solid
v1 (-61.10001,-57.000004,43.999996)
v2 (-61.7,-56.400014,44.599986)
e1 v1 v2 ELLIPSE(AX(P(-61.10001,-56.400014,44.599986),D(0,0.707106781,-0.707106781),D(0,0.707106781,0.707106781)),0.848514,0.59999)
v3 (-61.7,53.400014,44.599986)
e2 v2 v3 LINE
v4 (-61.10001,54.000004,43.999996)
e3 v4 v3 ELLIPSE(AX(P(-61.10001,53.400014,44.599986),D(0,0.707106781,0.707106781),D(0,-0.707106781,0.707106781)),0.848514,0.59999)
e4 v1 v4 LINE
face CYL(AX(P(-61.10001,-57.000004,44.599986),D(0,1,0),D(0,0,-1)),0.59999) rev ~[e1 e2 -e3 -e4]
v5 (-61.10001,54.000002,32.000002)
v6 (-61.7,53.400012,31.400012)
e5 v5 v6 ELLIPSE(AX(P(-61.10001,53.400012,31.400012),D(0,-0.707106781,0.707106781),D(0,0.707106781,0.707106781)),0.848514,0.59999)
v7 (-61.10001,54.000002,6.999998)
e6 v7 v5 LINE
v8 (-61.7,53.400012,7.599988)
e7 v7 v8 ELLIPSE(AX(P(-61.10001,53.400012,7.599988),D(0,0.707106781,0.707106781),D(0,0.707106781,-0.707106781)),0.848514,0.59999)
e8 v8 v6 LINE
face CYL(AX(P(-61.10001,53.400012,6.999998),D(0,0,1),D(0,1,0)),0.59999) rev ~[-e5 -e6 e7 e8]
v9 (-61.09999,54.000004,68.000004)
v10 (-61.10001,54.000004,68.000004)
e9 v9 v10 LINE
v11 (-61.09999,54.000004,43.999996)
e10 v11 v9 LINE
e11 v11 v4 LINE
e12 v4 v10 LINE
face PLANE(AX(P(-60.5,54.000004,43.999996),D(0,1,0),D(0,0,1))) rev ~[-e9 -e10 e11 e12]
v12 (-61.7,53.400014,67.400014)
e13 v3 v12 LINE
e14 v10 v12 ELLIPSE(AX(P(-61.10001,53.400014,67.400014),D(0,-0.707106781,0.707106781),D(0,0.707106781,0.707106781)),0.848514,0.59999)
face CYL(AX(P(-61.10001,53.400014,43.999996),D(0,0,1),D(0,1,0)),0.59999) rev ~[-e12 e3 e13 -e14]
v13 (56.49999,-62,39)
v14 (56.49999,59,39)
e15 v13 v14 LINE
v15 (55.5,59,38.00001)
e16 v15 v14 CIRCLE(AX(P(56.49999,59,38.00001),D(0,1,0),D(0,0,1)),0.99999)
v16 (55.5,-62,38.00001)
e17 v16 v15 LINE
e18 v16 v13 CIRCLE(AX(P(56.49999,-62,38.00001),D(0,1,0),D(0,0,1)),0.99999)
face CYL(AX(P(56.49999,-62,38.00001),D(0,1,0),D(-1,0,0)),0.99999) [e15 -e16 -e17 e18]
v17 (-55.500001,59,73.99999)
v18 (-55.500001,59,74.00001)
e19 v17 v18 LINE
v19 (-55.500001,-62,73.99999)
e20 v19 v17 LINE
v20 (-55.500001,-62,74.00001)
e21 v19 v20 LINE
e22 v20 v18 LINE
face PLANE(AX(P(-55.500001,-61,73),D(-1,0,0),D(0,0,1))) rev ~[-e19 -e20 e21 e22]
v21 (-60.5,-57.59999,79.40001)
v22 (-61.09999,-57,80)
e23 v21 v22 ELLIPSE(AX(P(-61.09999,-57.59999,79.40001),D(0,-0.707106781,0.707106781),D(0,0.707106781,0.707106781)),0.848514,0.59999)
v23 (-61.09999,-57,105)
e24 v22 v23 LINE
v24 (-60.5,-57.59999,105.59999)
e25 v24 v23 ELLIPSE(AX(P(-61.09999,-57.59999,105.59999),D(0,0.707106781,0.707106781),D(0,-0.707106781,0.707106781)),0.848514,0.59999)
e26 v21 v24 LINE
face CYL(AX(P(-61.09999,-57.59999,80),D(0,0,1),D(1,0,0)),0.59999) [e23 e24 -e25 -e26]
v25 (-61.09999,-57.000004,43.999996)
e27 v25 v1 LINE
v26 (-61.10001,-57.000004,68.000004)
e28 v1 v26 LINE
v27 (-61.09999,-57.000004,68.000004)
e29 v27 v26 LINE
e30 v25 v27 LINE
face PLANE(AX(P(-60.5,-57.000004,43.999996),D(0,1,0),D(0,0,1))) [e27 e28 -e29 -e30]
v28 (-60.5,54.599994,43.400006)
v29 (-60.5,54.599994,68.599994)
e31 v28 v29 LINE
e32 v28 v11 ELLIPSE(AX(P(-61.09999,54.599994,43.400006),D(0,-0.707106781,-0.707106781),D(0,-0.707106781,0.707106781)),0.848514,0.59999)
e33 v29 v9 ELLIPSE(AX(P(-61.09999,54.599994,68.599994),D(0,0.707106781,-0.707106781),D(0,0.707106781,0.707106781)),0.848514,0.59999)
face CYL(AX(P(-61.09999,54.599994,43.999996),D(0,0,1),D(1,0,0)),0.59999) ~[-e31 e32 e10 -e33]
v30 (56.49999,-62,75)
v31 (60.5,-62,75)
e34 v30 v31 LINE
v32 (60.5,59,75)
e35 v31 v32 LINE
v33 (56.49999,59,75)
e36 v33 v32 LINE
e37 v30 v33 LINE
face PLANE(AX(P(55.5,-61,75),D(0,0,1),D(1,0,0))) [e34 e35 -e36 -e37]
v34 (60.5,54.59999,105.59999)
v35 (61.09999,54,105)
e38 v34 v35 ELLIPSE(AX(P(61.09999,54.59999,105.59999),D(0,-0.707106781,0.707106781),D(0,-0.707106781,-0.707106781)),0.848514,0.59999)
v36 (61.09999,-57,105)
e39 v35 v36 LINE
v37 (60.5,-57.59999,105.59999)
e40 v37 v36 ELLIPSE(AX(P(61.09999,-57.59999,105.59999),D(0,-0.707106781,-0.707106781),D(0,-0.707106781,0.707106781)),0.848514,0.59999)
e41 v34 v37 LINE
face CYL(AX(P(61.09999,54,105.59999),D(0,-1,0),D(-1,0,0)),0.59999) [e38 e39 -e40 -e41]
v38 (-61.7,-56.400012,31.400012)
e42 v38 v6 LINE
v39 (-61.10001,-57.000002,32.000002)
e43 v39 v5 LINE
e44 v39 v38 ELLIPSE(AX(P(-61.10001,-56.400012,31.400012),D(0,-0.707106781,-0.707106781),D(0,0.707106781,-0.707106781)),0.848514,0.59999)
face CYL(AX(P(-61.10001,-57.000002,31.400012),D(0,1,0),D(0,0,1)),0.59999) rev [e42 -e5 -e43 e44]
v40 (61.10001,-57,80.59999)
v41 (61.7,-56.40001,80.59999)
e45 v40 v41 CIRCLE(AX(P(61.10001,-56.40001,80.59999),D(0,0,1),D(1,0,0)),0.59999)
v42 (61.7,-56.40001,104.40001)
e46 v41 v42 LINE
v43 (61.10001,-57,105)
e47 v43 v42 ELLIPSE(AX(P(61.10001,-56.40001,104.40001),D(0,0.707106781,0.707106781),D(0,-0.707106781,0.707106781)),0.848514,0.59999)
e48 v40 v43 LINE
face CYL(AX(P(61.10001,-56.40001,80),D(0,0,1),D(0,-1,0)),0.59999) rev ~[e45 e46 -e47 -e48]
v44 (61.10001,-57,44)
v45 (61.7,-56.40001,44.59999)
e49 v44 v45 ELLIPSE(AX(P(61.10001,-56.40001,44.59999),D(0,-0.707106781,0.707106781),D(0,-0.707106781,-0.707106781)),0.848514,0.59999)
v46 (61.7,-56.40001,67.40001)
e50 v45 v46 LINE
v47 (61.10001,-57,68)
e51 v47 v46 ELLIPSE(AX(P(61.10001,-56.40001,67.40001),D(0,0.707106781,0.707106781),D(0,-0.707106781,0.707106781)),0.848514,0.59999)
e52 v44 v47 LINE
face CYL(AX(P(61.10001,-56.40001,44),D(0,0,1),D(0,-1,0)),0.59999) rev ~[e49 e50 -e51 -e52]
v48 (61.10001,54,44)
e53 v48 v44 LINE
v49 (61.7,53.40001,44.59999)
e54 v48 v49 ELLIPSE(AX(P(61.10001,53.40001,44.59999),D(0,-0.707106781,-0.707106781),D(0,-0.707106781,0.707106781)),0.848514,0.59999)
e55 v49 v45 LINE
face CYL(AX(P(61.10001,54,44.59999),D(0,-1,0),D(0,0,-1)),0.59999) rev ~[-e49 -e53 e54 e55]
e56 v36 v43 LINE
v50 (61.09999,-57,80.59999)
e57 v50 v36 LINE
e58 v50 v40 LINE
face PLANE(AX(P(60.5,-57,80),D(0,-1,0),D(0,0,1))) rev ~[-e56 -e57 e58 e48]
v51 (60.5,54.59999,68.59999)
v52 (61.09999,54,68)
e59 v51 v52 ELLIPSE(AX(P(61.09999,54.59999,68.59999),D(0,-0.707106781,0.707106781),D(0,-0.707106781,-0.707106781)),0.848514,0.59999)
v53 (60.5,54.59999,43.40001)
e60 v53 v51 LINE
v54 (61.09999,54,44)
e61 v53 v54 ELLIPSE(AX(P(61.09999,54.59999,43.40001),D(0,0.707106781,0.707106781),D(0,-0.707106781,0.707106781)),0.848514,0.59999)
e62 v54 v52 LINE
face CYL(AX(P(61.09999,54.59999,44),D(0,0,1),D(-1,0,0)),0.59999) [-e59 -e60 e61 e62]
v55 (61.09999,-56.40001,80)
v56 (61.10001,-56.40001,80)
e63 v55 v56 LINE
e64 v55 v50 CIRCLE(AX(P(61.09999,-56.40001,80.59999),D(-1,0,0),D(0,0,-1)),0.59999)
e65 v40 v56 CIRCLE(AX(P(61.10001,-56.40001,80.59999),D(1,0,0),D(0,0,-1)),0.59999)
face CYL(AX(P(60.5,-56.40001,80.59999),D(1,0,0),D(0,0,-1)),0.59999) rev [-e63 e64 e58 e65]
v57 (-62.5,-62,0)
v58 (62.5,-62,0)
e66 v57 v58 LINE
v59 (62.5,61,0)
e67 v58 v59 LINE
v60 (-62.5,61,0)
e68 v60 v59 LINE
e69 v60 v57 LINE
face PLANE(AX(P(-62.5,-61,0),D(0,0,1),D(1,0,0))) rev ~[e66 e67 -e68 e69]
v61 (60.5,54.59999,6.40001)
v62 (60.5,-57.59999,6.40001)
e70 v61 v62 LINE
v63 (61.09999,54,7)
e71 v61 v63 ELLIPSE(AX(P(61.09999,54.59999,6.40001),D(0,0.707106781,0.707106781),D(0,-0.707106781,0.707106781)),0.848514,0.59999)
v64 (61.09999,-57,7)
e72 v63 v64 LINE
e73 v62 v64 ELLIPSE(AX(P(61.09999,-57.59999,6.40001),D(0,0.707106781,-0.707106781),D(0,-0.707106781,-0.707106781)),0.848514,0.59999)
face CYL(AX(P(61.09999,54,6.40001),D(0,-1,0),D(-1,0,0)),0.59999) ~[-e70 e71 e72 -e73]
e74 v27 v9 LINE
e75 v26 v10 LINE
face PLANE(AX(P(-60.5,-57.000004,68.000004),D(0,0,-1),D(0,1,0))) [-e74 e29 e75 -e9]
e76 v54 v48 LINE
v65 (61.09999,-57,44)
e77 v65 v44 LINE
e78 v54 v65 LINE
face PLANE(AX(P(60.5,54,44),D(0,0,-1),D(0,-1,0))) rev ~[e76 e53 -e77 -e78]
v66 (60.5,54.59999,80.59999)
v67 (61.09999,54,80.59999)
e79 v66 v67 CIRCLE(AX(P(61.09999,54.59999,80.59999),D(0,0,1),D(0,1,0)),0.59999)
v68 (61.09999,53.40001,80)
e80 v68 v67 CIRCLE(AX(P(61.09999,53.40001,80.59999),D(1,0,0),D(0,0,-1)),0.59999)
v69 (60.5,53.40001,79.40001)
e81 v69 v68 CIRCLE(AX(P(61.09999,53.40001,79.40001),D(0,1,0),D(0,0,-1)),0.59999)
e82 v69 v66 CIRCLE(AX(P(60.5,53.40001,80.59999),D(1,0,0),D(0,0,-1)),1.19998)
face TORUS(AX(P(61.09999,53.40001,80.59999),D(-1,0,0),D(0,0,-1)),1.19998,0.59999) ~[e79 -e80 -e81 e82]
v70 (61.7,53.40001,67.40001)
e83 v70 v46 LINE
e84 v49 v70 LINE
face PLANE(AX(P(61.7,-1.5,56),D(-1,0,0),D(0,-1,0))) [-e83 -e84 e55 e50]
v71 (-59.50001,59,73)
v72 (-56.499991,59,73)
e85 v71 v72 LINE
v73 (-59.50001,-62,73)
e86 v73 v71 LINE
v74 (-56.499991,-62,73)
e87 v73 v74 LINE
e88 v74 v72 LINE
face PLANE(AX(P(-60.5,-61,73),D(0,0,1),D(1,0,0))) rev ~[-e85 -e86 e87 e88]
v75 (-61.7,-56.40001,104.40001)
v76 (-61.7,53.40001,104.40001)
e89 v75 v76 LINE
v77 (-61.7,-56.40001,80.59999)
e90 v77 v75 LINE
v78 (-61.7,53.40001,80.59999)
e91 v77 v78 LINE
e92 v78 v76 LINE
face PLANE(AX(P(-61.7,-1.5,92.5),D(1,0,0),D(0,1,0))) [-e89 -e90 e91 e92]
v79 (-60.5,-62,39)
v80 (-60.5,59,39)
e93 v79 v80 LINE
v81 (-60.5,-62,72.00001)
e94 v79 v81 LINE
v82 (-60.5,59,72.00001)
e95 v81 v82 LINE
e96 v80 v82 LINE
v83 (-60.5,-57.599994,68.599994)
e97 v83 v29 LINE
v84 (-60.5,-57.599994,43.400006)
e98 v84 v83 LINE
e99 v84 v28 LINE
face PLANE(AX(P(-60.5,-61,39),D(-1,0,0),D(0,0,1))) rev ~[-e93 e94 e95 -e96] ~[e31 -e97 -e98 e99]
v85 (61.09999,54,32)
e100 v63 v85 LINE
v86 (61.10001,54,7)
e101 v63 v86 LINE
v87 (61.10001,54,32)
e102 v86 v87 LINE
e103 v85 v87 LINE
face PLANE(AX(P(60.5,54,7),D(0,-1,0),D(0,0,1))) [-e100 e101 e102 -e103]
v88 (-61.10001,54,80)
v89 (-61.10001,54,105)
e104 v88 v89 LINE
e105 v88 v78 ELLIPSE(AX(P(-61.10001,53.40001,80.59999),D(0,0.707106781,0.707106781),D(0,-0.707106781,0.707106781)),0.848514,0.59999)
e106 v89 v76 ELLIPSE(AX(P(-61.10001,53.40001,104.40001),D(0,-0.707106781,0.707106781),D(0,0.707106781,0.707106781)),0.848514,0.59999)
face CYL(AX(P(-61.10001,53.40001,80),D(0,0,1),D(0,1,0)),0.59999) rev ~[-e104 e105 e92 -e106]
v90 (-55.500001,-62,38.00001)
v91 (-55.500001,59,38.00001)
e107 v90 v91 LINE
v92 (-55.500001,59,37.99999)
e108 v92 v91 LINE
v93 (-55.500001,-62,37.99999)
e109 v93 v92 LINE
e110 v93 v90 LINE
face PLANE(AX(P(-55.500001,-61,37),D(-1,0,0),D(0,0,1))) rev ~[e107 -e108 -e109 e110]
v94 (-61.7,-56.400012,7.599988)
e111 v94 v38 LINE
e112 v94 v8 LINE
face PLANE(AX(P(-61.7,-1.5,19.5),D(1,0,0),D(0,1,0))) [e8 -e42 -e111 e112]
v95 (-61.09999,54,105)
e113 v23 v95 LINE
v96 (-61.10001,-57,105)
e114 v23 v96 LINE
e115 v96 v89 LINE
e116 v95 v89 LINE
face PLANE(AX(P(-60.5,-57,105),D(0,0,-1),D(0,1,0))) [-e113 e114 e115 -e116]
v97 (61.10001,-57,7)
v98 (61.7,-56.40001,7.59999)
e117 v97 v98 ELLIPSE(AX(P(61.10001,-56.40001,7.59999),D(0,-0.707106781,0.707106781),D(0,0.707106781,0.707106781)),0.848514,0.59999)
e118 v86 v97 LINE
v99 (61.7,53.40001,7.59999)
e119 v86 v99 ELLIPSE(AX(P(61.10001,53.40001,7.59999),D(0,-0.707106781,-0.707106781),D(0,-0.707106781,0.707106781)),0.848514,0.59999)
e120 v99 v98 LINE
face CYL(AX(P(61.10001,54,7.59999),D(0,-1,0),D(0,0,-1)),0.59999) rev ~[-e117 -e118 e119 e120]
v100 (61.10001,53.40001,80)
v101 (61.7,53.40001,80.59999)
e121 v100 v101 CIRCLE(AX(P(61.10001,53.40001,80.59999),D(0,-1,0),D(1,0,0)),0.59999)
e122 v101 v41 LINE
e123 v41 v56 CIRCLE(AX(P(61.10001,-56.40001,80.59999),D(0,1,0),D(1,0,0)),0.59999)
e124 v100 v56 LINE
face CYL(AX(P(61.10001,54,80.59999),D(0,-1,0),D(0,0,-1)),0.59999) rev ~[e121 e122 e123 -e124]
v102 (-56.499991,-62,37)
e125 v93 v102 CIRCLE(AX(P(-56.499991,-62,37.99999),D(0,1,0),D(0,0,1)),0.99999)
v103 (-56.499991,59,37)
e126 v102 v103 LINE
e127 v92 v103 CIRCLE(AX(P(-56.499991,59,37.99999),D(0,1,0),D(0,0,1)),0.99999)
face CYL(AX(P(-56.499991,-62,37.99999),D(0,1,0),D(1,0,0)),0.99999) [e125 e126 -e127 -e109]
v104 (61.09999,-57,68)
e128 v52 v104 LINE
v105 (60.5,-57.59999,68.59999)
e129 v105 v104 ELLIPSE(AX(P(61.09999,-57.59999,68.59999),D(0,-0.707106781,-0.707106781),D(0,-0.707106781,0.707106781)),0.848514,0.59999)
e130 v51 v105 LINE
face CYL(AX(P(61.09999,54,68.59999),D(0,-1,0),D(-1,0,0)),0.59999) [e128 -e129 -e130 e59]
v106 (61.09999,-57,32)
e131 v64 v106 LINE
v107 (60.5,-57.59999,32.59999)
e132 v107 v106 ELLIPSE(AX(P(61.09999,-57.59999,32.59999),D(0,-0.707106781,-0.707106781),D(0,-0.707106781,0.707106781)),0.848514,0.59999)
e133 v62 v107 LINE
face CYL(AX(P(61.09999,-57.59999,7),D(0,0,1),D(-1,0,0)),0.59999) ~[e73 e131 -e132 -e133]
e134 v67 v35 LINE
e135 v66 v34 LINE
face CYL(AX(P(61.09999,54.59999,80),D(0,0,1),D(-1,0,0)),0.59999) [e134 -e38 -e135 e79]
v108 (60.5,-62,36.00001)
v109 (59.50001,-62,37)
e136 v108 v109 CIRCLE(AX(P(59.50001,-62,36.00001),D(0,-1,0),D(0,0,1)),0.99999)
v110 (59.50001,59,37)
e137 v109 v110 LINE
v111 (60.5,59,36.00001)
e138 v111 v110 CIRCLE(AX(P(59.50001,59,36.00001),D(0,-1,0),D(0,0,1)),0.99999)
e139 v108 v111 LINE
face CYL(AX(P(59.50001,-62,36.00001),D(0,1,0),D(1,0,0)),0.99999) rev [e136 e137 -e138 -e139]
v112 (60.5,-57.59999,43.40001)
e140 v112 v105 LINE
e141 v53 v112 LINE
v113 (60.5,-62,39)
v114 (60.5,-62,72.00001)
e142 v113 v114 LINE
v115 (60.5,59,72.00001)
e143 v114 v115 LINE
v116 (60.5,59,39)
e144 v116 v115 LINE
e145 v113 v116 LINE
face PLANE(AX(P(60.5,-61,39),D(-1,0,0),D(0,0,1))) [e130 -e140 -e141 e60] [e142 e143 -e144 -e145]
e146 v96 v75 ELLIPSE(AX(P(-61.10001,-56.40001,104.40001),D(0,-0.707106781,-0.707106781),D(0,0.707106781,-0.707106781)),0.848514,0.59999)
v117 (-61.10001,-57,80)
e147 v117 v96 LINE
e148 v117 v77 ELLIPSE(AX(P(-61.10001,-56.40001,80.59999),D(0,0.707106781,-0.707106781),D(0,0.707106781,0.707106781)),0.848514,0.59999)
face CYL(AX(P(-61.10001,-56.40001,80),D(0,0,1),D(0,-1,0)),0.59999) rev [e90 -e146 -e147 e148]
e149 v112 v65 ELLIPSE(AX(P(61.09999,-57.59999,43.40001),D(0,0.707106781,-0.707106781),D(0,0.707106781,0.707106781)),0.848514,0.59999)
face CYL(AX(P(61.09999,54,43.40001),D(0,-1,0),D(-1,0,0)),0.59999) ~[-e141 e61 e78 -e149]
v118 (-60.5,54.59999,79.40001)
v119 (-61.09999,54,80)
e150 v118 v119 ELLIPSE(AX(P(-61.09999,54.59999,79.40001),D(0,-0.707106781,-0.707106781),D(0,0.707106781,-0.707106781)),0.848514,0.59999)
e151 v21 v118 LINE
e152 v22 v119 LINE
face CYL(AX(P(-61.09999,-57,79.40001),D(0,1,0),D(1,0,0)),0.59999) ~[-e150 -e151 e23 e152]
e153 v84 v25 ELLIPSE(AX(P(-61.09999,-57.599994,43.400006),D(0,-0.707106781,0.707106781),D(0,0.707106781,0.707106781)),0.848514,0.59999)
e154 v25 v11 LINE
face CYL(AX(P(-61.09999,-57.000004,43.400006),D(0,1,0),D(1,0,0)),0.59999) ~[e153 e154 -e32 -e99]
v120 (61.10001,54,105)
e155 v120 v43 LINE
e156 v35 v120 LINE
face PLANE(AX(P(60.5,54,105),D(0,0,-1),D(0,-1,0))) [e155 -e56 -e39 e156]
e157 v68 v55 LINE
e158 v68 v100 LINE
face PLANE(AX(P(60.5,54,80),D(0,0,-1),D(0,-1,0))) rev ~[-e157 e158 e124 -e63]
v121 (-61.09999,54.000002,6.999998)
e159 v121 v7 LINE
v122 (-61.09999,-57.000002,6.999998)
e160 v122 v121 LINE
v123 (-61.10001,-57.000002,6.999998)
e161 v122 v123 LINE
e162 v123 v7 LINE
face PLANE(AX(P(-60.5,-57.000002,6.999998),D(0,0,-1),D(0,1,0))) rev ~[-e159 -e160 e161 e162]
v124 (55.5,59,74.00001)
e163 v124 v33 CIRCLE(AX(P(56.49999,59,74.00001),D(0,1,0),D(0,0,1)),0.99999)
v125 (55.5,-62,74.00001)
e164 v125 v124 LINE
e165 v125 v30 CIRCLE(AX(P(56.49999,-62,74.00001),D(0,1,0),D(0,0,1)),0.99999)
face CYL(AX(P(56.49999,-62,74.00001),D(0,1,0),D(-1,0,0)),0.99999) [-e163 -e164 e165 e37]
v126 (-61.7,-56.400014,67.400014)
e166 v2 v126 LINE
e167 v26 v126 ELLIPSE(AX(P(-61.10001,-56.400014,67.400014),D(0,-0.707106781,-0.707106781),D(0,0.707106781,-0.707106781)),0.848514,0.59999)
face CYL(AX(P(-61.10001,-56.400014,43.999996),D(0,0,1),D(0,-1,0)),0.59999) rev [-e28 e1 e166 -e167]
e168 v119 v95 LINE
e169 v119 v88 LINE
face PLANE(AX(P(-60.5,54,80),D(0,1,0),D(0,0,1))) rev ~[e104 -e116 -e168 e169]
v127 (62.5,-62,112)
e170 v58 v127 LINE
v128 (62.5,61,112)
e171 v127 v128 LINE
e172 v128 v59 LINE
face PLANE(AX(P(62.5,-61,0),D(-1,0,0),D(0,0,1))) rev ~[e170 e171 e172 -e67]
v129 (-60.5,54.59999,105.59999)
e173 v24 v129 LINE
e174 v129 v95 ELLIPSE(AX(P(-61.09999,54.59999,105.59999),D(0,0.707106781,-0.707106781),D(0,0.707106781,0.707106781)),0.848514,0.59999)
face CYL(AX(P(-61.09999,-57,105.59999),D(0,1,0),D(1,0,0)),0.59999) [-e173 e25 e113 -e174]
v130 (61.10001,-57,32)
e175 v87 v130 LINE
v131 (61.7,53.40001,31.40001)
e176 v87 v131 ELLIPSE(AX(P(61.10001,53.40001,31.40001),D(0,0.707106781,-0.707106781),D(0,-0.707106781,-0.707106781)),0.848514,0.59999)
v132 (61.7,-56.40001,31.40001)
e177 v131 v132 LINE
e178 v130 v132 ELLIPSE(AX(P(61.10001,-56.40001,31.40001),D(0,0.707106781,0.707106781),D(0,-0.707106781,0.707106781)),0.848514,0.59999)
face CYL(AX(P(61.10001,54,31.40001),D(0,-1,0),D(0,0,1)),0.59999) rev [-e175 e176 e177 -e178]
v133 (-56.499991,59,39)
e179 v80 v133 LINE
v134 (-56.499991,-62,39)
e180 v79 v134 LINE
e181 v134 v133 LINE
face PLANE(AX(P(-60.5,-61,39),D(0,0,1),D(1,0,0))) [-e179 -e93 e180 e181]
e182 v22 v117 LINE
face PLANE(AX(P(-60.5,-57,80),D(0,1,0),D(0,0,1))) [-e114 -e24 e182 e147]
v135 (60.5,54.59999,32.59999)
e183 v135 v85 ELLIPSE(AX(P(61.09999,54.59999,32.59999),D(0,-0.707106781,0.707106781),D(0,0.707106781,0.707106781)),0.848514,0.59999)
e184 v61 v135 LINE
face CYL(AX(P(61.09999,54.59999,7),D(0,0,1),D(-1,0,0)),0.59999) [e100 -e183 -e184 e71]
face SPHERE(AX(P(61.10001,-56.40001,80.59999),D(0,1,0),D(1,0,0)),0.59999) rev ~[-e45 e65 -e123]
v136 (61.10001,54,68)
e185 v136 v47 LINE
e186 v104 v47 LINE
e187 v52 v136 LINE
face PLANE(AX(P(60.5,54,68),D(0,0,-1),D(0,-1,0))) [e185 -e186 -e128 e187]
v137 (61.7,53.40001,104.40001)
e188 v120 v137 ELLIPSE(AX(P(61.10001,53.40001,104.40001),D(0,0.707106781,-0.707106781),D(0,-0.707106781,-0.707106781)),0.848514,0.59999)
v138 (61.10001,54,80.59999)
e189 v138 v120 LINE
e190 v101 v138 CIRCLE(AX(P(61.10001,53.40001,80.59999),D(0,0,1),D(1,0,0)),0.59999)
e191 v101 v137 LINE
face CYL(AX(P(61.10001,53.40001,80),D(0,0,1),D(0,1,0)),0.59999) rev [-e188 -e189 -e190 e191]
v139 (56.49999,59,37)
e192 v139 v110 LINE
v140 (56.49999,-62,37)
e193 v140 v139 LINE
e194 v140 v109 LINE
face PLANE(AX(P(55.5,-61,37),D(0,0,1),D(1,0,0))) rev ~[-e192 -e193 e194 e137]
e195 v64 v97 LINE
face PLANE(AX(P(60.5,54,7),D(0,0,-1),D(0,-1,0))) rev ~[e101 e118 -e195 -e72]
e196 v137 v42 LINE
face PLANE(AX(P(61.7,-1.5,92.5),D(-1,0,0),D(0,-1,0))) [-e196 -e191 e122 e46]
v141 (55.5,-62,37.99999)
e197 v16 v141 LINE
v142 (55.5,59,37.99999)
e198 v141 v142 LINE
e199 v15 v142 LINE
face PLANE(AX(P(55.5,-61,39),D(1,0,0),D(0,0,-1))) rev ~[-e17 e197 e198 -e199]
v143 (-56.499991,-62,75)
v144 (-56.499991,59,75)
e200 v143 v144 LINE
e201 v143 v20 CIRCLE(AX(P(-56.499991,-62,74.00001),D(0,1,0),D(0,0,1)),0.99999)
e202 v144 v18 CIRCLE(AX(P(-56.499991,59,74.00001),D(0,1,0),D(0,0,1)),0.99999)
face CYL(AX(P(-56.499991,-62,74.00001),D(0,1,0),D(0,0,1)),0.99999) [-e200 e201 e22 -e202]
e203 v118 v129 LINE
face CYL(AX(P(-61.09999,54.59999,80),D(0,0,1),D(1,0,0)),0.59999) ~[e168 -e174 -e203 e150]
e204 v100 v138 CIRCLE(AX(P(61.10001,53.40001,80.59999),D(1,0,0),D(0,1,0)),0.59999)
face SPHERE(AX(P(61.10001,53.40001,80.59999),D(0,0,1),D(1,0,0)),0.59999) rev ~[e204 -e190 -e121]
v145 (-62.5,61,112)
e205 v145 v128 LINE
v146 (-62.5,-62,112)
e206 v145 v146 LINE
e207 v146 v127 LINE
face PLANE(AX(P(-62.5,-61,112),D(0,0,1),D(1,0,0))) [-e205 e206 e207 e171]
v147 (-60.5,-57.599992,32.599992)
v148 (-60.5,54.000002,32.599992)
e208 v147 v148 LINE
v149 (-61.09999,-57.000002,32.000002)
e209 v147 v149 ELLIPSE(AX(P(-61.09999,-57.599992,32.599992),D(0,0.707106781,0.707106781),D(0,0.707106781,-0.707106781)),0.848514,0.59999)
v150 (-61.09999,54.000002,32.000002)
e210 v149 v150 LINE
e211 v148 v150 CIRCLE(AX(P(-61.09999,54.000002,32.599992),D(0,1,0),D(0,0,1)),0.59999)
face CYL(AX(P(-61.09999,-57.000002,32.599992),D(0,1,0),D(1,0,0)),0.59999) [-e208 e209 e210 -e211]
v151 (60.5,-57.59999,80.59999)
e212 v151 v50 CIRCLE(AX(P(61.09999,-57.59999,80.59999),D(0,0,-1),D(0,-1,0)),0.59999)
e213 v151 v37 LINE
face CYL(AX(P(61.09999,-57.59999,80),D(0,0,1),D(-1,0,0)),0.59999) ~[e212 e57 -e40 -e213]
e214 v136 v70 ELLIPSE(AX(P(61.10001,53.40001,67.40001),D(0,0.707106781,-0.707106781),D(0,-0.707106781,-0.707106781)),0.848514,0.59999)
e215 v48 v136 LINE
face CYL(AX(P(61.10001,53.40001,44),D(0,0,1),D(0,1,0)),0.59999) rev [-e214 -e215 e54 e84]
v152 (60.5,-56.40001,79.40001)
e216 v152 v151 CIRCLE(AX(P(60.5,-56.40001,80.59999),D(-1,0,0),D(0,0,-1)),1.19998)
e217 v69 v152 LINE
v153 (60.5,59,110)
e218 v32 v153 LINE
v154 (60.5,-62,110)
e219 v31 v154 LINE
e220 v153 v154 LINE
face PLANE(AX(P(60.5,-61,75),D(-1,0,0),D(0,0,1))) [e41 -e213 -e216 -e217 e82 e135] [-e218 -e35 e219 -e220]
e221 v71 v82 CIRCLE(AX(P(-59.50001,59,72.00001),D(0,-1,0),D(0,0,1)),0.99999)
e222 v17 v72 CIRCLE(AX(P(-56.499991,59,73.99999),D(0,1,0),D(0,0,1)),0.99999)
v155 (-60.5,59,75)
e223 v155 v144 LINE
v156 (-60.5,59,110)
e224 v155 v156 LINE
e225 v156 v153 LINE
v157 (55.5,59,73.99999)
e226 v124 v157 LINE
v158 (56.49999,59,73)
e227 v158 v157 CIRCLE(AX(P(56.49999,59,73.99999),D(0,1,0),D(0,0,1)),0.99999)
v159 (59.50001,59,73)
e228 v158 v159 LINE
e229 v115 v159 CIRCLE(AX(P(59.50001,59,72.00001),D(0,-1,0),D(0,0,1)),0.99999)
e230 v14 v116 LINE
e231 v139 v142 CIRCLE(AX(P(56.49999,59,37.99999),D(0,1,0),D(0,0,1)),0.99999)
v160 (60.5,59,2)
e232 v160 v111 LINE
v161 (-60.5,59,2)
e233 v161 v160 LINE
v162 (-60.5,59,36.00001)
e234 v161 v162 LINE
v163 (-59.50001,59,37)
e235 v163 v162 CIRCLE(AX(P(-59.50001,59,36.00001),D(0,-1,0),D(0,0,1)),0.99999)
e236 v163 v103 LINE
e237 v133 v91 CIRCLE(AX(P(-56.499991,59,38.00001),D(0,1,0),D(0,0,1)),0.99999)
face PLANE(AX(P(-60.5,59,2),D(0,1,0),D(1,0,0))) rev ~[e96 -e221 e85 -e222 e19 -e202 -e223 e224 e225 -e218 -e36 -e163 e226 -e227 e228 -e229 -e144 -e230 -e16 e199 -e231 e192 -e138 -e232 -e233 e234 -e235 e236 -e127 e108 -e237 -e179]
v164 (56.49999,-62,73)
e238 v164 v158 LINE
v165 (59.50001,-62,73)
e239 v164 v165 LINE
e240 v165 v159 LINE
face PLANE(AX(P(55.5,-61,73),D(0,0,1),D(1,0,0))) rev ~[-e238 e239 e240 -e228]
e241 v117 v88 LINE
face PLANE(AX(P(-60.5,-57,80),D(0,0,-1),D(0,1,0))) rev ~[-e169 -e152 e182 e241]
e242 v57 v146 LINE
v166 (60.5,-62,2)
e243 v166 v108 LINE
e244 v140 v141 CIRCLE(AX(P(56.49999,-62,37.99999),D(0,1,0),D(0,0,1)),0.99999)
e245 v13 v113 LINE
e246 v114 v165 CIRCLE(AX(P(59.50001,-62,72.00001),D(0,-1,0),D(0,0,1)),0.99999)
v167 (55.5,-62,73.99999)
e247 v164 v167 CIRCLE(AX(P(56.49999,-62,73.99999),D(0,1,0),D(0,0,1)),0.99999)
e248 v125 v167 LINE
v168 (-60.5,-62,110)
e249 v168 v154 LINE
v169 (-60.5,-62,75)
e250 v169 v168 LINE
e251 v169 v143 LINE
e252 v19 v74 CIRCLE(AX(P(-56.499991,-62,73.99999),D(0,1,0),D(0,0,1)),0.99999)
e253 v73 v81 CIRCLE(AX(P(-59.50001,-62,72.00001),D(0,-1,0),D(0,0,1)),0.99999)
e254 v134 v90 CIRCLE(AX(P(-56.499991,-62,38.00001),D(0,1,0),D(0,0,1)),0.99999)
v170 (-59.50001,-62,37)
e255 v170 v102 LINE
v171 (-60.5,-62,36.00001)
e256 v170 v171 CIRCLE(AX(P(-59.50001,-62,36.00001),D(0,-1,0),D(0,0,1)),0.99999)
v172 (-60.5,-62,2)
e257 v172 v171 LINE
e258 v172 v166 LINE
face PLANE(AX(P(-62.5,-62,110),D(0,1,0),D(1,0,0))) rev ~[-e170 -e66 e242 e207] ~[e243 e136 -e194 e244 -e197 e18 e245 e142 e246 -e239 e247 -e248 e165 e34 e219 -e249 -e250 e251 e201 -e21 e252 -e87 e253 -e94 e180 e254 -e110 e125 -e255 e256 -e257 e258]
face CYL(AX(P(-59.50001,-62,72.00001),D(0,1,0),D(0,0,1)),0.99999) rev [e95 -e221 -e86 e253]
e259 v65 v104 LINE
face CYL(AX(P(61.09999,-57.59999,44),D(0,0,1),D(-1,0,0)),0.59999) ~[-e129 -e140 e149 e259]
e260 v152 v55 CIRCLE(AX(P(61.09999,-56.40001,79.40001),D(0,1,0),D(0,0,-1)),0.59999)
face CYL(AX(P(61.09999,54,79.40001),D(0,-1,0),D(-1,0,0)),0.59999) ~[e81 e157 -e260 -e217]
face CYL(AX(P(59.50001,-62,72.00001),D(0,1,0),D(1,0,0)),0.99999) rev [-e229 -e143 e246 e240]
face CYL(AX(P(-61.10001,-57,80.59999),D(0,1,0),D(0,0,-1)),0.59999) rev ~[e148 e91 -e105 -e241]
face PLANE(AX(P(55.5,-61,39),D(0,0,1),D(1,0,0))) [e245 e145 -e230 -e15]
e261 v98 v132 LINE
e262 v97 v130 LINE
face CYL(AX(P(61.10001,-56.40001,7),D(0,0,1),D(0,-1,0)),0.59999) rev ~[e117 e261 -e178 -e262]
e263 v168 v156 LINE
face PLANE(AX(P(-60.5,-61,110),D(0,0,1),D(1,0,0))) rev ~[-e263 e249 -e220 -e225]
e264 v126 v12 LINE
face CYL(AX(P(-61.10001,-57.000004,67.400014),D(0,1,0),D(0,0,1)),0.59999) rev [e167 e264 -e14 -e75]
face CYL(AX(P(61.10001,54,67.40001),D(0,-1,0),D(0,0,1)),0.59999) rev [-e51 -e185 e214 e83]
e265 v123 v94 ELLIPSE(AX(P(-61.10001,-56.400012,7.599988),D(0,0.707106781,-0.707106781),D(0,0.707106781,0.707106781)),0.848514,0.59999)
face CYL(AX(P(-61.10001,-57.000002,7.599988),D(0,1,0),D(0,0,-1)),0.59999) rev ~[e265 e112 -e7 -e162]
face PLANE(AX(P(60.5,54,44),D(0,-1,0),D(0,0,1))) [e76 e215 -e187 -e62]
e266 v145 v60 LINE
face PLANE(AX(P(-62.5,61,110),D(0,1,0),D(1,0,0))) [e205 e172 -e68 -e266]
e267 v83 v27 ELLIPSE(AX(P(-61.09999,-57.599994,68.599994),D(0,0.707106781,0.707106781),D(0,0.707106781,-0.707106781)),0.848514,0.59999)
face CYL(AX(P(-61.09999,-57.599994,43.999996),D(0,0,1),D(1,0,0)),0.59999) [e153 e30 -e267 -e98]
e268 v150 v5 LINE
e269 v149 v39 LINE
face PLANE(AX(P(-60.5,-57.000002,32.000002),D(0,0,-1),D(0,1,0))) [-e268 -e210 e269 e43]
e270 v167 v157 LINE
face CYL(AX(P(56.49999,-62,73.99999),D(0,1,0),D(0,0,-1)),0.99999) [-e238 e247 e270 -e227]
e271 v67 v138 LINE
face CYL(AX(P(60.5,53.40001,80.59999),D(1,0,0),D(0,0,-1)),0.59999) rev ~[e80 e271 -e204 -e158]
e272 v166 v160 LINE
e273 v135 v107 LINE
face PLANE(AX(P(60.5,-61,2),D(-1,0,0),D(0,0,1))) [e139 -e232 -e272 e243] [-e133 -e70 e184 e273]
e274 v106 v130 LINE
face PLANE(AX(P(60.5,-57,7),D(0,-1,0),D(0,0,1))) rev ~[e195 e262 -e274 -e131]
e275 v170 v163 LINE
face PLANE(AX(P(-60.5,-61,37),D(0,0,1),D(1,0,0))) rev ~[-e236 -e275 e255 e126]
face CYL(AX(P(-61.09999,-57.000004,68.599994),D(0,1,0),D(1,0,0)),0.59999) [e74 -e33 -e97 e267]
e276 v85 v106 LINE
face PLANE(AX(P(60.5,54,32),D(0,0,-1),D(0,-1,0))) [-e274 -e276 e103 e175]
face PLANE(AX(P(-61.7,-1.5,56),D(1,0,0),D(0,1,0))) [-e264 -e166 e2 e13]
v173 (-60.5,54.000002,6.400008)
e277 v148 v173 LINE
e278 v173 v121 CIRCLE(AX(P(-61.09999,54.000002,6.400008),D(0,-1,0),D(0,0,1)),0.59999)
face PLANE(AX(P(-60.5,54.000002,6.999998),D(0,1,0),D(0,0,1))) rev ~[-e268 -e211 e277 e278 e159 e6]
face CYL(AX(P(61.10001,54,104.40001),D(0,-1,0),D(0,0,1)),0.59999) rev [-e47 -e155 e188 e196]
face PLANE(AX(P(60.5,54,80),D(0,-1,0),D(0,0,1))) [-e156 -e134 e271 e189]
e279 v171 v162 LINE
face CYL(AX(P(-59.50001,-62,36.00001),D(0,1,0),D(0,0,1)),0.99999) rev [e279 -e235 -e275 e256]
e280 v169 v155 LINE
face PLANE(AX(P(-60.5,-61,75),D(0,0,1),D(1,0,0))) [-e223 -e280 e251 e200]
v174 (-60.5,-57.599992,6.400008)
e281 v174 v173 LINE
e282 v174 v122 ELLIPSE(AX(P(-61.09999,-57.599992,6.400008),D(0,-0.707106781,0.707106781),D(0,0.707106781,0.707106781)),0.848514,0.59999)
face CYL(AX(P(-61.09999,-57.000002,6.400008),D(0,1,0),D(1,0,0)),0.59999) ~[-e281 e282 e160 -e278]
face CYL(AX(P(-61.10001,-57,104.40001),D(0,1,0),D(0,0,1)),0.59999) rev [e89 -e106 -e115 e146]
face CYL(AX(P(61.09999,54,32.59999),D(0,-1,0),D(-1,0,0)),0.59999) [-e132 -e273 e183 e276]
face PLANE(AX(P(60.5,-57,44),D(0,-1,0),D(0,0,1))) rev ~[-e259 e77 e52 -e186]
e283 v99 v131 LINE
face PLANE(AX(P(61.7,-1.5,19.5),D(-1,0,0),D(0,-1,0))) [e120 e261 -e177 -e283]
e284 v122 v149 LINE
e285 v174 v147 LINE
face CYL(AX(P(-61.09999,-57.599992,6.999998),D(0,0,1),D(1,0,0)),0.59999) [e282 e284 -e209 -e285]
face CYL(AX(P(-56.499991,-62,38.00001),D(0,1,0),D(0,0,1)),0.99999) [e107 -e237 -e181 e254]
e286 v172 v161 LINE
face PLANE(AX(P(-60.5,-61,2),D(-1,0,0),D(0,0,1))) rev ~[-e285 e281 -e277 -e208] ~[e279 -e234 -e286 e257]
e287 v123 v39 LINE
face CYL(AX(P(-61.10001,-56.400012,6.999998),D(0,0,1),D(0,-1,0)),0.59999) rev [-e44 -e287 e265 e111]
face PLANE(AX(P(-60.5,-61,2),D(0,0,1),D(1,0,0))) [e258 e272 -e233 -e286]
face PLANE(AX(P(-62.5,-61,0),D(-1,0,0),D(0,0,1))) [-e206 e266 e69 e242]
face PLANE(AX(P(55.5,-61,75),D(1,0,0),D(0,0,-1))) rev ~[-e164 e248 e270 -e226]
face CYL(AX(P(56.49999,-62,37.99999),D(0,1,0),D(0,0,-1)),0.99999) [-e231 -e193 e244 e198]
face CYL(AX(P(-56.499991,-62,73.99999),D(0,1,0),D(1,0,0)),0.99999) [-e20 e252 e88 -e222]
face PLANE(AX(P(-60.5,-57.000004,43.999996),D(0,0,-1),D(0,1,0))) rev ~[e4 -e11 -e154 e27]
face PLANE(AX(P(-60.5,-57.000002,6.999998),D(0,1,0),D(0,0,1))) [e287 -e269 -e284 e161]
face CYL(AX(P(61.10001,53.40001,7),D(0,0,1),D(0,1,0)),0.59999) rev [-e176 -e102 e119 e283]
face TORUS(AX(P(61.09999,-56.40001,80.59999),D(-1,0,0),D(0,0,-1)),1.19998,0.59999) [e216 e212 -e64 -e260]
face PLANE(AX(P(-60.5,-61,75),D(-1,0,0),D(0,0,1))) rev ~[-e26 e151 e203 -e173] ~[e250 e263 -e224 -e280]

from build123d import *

# Parameters (mm, degrees)
F0_W      = 125
F0_H      = 122
F1_DEPTH  = 2
F2_W      = 121
F2_H      = 2
F2_W_2    = 2
F2_H_2    = 120
F3_DEPTH  = 108
F4_W      = 125
F4_H      = 122
F5_DEPTH  = 2
F6_W      = 4.9999992847
F6_H      = 1
F6_W_2    = 5
F7_DEPTH  = 120
F8_DEPTH  = 1
F9_W      = 111
F9_H      = 25
F9_W_2    = 111.000007391
F9_H_2    = 24.000007391
F9_W_3    = 111.0000030398
F9_H_3    = 25.0000030398
F11_DEPTH = 1.2
F10_W     = 111
F10_H     = 25
F10_H_2   = 24
F12_DEPTH = 1.2
F13_R     = 0.99999
F14_R     = 0.59999


# Not quite as in the source:
# - a fillet or chamfer is up to 0.001 mm smaller than in the source, because OpenCascade refuses the exact size
# - a feature names something its author has since deleted; it is built from what else it names


with BuildPart() as f1:
    # F0 (on Top) → F1 (new body)
    with BuildSketch(Plane.XY):
        Rectangle(F0_W, F0_H)
    extrude(amount=F1_DEPTH)

    # F2 (on face) → F3 (join)
    with BuildSketch(Plane.XY.offset(2)):
        with Locations((0, 60)):
            Rectangle(F2_W, F2_H)
        with Locations((-61.5, 60)):
            Rectangle(F2_W_2, F2_H)
        with Locations((-61.5, -1)):
            Rectangle(F2_W_2, F2_H_2)
        with Locations((61.5, -1)):
            Rectangle(F2_W_2, F2_H_2)
        with Locations((61.5, 60)):
            Rectangle(F2_W_2, F2_H)
    extrude(amount=F3_DEPTH)

    # F4 (on face) → F5 (join)
    with BuildSketch(Plane.XY.offset(110)):
        Rectangle(F4_W, F4_H)
    extrude(amount=F5_DEPTH)

    # F6 (on face) → F7 (join)
    with BuildSketch(Plane.XZ.offset(61)):
        with Locations((-58.0000003576, 74.5)):
            Rectangle(F6_W, F6_H)
        with Locations((-58.0000003576, 73.5)):
            Rectangle(F6_W, F6_H)
        with Locations((-58.0000003576, 38.5)):
            Rectangle(F6_W, F6_H)
        with Locations((-58.0000003576, 37.5)):
            Rectangle(F6_W, F6_H)
        with Locations((58, 74.5)):
            Rectangle(F6_W_2, F6_H)
        with Locations((58, 73.5)):
            Rectangle(F6_W_2, F6_H)
        with Locations((58, 38.5)):
            Rectangle(F6_W_2, F6_H)
        with Locations((58, 37.5)):
            Rectangle(F6_W_2, F6_H)
    extrude(amount=-F7_DEPTH)

    # F8 (add): a face of the model
    f8_faces = [f1.faces().sort_by_distance(p)[0] for p in [
        (-60.821637703, -61, 56),
    ]]
    extrude(f8_faces, amount=F8_DEPTH)

    # F9 (on face) → F11 (cut)
    with BuildSketch(Plane.YZ.offset(-60.5)):
        with Locations((-1.5, 92.5)):
            Rectangle(F9_W, F9_H)
        with Locations((-1.5, 56)):
            Rectangle(F9_W_2, F9_H_2)
        with Locations((-1.5, 19.5)):
            Rectangle(F9_W_3, F9_H_3)
    extrude(amount=-F11_DEPTH, mode=Mode.SUBTRACT)

    # F10 (on face) → F12 (cut)
    with BuildSketch(Plane(origin=(60.5, 0, 0), x_dir=(0, -1, 0), z_dir=(-1, 0, 0))):
        with Locations((1.5, 92.5)):
            Rectangle(F10_W, F10_H)
        with Locations((1.5, 56)):
            Rectangle(F10_W, F10_H_2)
        with Locations((1.5, 19.5)):
            Rectangle(F10_W, F10_H)
    extrude(amount=-F12_DEPTH, mode=Mode.SUBTRACT)

    # F13 (radius 1 in the source; OpenCascade refuses exactly that, so slightly less here)
    f13_edges = [f1.edges().sort_by_distance(p)[0] for p in [
        (55.5, -1.5, 75),
        (55.5, -1.5, 73),
        (55.5, -1.5, 39),
        (55.5, -1.5, 37),
        (-55.500001, -1.5, 75),
        (-55.500001, -1.5, 73),
        (-55.500001, -1.5, 39),
        (-55.500001, -1.5, 37),
        (-60.5, -1.5, 73),
        (-60.5, -1.5, 37),
        (60.5, -1.5, 73),
        (60.5, -1.5, 37),
    ]]
    fillet(f13_edges, radius=F13_R)

    # F14 (radius 0.6 in the source; OpenCascade refuses exactly that, so slightly less here)
    f14_edges = [f1.edges().sort_by_distance(p)[0] for p in [
        (-61.7, 54, 92.5),
        (-61.7, -1.5, 105),
        (-61.7, -57, 92.5),
        (-61.7, -1.5, 80),
        (-60.5, -1.5, 80),
        (-60.5, -57, 92.5),
        (-60.5, -1.5, 105),
        (-60.5, 54, 92.5),
        (-61.7, 54.000004, 56),
        (-61.7, -1.5, 68.000004),
        (-61.7, -57.000004, 56),
        (-61.7, -1.5, 43.999996),
        (-60.5, -1.5, 68.000004),
        (-60.5, -57.000004, 56),
        (-60.5, 54.000004, 56),
        (-60.5, -1.5, 43.999996),
        (-61.7, -1.5, 6.999998),
        (-61.7, 54.000002, 19.5),
        (-61.7, -1.5, 32.000002),
        (-61.7, -57.000002, 19.5),
        (-60.5, -1.5, 32.000002),
        (-60.5, -57.000002, 19.5),
        (-60.5, -1.5, 6.999998),
        (61.7, -57, 19.5),
        (61.7, -1.5, 32),
        (61.7, 54, 19.5),
        (61.7, -1.5, 7),
        (61.7, -1.5, 68),
        (61.7, 54, 56),
        (61.7, -1.5, 44),
        (61.7, -57, 56),
        (61.7, -1.5, 105),
        (61.7, 54, 92.5),
        (61.7, -1.5, 80),
        (61.7, -57, 92.5),
        (60.5, -1.5, 105),
        (60.5, 54, 92.5),
        (60.5, -57, 92.5),
        (61.1, 54, 80),
        (61.1, -57, 80),
        (60.5, -1.5, 80),
        (60.5, -1.5, 68),
        (60.5, -57, 56),
        (60.5, 54, 56),
        (60.5, -1.5, 44),
        (60.5, 54, 19.5),
        (60.5, -1.5, 32),
        (60.5, -1.5, 7),
        (60.5, -57, 19.5),
    ]]
    fillet(f14_edges, radius=F14_R)


solid = f1.part
